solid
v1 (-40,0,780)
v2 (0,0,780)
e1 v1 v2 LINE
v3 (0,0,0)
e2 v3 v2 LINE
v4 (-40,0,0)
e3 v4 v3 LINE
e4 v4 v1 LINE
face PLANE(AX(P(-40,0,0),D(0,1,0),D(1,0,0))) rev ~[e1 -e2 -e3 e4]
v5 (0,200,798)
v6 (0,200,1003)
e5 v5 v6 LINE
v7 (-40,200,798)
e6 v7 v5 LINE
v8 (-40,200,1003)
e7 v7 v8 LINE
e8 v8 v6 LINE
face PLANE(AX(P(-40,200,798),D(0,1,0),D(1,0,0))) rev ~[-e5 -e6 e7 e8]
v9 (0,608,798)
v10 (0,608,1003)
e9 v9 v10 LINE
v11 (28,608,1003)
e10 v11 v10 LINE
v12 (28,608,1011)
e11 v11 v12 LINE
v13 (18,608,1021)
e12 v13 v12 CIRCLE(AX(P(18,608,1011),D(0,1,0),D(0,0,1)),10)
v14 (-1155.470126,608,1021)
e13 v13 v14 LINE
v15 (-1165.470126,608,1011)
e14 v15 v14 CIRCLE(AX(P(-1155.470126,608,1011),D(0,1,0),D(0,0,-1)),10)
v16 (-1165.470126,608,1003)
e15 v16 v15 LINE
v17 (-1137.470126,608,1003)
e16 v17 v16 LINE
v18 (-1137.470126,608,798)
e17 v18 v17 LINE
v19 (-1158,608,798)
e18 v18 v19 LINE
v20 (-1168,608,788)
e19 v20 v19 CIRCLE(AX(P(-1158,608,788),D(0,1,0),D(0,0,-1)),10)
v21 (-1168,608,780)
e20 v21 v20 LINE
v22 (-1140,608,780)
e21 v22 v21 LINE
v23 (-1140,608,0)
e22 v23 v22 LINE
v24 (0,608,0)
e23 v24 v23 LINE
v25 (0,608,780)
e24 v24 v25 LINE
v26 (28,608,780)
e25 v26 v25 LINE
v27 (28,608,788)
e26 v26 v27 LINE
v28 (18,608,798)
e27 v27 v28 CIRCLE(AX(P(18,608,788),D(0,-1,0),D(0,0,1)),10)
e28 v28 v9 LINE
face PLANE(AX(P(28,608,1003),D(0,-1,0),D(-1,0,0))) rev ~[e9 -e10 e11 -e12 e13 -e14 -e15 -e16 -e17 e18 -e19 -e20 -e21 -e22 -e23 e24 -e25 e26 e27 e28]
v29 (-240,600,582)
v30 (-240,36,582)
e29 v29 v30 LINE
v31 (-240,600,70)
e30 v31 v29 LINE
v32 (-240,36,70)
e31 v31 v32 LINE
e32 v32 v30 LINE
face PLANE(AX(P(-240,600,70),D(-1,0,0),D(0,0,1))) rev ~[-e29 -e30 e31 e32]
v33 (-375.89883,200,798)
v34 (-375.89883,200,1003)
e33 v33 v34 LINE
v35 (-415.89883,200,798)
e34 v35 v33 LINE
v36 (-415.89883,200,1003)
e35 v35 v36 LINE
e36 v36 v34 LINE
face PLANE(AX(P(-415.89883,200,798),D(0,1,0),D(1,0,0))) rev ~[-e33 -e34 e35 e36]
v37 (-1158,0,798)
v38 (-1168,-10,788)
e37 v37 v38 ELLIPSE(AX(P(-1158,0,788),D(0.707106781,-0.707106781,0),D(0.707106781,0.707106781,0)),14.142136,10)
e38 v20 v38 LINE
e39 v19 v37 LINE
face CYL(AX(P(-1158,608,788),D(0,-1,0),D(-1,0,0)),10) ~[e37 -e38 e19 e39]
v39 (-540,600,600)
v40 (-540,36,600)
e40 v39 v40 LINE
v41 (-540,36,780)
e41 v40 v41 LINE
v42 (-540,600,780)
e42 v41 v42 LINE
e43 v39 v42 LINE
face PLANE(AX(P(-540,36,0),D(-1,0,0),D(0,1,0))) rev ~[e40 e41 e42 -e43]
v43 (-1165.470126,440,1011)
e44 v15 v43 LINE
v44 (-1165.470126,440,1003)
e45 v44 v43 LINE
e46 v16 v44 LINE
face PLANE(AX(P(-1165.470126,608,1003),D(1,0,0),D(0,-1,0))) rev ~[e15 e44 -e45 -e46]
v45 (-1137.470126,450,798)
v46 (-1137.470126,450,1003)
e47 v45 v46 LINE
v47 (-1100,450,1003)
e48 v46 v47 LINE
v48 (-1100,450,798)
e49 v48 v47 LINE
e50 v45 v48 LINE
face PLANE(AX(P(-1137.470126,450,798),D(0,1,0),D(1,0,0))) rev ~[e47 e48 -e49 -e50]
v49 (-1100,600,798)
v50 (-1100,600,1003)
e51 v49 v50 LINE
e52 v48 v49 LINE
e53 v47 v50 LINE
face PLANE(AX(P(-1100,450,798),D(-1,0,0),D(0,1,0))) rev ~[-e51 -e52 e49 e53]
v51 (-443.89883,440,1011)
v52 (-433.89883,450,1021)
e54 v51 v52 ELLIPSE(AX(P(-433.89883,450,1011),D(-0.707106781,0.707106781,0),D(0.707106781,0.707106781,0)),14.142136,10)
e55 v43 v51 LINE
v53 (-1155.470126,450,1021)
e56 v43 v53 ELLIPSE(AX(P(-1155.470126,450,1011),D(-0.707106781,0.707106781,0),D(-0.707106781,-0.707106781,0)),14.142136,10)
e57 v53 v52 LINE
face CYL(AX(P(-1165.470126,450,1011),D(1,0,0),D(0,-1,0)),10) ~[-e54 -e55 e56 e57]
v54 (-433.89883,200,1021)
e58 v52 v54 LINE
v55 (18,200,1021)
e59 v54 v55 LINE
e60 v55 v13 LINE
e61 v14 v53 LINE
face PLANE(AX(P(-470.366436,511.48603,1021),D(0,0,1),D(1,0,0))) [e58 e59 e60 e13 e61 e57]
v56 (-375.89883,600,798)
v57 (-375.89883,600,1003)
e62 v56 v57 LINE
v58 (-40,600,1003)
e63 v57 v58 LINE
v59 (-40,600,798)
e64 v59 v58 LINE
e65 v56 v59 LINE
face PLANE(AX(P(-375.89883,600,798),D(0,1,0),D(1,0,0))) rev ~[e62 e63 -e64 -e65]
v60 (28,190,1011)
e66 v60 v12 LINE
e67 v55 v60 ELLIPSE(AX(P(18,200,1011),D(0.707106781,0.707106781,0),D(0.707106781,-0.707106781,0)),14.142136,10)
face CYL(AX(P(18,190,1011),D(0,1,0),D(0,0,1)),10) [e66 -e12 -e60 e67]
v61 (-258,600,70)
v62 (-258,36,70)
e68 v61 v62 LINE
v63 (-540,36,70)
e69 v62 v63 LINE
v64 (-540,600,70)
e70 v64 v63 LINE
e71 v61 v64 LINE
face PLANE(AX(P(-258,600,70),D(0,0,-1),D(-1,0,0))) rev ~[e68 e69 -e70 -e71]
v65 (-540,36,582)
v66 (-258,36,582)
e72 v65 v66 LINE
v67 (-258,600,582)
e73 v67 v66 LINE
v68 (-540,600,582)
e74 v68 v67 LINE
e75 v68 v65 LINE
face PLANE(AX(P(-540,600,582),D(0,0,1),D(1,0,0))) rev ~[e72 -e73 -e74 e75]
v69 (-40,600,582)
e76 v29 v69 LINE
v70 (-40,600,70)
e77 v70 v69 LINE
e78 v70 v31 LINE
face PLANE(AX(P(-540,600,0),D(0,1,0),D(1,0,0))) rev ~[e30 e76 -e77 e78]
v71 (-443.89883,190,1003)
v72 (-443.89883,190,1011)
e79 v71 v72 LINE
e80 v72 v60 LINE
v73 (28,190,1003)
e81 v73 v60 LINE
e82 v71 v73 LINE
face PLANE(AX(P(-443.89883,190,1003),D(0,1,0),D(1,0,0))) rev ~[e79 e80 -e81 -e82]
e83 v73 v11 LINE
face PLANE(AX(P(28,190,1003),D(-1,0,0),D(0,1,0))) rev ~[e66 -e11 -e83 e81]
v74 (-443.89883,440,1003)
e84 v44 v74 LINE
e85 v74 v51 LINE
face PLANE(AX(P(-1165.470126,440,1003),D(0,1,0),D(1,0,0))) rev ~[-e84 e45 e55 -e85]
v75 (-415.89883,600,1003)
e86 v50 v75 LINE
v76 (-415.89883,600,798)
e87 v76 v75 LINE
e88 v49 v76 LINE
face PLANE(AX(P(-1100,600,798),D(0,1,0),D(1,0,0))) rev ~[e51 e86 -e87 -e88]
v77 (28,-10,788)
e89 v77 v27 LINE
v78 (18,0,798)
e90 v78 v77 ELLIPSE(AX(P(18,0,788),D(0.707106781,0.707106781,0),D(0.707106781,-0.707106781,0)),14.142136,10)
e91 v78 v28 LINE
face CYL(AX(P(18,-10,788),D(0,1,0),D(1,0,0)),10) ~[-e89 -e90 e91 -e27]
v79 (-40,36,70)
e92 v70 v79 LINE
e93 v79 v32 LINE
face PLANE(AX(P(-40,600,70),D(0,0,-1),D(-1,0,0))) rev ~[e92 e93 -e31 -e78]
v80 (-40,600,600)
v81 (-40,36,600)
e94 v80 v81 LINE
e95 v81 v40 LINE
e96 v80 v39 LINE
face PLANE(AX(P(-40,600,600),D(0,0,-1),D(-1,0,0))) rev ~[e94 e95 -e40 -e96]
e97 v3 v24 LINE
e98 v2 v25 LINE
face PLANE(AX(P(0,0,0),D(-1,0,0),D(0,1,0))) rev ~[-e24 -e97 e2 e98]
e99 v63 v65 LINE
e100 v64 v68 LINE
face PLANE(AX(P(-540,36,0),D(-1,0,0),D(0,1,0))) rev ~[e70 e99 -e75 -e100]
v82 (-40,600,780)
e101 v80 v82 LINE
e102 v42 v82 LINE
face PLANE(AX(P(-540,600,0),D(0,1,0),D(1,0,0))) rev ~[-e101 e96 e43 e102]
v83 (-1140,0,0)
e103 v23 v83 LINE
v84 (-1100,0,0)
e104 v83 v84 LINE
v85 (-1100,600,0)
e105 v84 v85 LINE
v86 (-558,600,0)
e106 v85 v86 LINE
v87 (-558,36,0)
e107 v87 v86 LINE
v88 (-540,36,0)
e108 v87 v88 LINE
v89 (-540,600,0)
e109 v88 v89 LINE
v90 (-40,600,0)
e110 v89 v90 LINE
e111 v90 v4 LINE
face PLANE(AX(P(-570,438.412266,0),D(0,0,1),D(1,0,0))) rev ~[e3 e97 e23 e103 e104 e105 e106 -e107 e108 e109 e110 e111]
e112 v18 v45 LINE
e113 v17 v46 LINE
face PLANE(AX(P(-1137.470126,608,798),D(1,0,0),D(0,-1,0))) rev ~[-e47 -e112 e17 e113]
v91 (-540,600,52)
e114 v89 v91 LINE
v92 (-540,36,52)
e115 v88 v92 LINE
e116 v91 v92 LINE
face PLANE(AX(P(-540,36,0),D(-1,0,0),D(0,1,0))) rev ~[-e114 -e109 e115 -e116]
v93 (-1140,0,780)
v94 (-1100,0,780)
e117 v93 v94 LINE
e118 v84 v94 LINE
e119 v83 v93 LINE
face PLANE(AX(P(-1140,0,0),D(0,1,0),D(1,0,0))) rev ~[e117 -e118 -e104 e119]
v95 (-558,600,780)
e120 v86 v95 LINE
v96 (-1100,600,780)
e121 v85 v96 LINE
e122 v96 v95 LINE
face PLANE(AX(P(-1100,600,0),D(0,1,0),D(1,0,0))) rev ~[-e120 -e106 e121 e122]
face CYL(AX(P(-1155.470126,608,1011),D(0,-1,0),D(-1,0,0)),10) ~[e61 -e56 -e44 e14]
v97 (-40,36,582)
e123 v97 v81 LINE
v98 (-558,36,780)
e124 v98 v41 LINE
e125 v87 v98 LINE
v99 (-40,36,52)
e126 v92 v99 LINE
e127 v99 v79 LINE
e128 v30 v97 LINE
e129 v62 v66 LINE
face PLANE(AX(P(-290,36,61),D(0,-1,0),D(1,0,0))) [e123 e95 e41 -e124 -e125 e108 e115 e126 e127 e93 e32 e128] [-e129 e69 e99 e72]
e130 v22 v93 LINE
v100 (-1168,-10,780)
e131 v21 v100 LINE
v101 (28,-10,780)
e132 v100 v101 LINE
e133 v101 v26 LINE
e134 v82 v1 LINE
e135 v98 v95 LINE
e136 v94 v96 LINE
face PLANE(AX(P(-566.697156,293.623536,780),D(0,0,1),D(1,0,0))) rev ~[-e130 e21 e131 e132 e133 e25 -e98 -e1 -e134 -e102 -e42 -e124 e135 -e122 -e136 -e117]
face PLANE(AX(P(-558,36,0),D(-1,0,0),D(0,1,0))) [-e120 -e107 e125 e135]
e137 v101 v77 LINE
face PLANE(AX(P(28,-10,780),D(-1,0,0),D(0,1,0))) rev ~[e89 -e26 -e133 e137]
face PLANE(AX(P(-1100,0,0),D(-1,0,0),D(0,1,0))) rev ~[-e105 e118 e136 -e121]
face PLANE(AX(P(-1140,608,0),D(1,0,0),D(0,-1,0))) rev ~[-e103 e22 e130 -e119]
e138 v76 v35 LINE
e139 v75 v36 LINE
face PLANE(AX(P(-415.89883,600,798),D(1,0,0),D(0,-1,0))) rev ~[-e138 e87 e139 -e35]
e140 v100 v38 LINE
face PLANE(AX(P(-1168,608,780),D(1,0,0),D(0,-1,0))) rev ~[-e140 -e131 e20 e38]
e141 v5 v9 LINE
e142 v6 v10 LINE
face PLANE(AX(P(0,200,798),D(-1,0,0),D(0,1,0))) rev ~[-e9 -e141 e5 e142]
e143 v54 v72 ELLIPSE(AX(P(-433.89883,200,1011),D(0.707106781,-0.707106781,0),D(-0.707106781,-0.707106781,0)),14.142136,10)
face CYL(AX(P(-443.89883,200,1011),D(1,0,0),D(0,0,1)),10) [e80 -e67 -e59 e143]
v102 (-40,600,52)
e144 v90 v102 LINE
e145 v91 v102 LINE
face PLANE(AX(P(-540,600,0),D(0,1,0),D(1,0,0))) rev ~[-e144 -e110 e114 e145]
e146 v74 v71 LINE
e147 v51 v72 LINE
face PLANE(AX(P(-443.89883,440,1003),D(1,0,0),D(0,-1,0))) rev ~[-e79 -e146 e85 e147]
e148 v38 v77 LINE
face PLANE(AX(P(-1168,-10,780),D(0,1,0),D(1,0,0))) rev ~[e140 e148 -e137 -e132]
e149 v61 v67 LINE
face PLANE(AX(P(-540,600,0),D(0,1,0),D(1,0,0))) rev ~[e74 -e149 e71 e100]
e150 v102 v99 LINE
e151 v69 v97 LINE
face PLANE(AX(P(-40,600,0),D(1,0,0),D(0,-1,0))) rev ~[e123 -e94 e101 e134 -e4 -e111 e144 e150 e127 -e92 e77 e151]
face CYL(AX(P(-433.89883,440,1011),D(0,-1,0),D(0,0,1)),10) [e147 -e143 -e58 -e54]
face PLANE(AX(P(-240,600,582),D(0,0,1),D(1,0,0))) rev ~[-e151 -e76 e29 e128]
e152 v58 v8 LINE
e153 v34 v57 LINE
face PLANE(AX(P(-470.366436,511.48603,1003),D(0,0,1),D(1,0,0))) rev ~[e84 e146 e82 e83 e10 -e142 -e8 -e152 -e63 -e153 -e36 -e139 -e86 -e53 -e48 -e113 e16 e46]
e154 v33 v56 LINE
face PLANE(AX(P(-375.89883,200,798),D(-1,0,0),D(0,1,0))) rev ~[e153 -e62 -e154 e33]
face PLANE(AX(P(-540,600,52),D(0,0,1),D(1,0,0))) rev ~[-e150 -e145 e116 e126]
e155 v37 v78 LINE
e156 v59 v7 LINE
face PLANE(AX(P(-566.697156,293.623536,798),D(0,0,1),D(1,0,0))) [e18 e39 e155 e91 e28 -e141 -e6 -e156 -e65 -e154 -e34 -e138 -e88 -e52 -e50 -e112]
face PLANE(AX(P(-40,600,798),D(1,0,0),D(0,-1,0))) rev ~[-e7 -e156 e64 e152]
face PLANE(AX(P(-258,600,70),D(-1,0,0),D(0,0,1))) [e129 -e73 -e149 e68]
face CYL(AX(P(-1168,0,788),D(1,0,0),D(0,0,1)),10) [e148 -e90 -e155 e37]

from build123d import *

# Parameters (mm, degrees)
F0_W      = 18
F0_H      = 564
F1_DEPTH  = 780
F2_W      = 18
F2_H      = 512
F3_DEPTH  = 564
F5_DEPTH  = 18
F6_R      = 10
F7_W      = 40
F7_H      = 250
F7_H_2    = 150
F8_DEPTH  = 205
F10_DEPTH = 18
F11_R     = 10


with BuildPart() as f1:
    # F0 (on Top) → F1 (new body)
    with BuildSketch(Plane.XY):
        Polygon((-40, 0), (0, 0), (0, 608), (-1140, 608), (-1140, 0), (-1100, 0), (-1100, 600), (-558, 600), (-540, 600), (-40, 600), align=None)
        with Locations((-549, 318)):
            Rectangle(F0_W, F0_H)
    extrude(amount=F1_DEPTH)

    # F2 (on face) → F3 (join)
    with BuildSketch(Plane.XZ.offset(-600)):
        Polygon((-540, 70), (-540, 52), (-40, 52), (-40, 70), (-240, 70), (-258, 70), align=None)
        with Locations((-249, 326)):
            Rectangle(F2_W, F2_H)
        Polygon((-540, 600), (-540, 582), (-258, 582), (-240, 582), (-40, 582), (-40, 600), align=None)
    extrude(amount=F3_DEPTH)

    # F4 (on face) → F5 (join)
    with BuildSketch(Plane.XY.offset(780)):
        Polygon((28, 608), (0, 608), (0, 0), (-40, 0), (-40, 600), (-540, 600), (-540, 36), (-558, 36), (-558, 600), (-1100, 600), (-1100, 0), (-1140, 0), (-1140, 608), (-1168, 608), (-1168, -10), (28, -10), align=None)
        Polygon((0, 0), (0, 608), (-1140, 608), (-1140, 0), (-1100, 0), (-1100, 600), (-558, 600), (-558, 36), (-540, 36), (-540, 600), (-40, 600), (-40, 0), align=None)
    extrude(amount=F5_DEPTH)

    # F6
    f6_edges = [f1.edges().sort_by_distance(p)[0] for p in [
        (-570, -10, 798),
        (-1168, 299, 798),
        (28, 299, 798),
    ]]
    fillet(f6_edges, radius=F6_R)

    # F7 (on face) → F8 (join)
    with BuildSketch(Plane.XY.offset(798)):
        Polygon((0, 450), (0, 608), (-40, 608), (-40, 600), (-40, 450), align=None)
        Polygon((-40, 600), (-40, 608), (-1100, 608), (-1100, 600), (-415.8988296986, 600), (-375.8988296986, 600), align=None)
        with Locations((-20, 325)):
            Rectangle(F7_W, F7_H)
        Polygon((-1100, 600), (-1100, 608), (-1137.470126152, 608), (-1137.470126152, 450), (-1100, 450), align=None)
        with Locations((-395.8988296986, 525)):
            Rectangle(F7_W, F7_H_2)
        with Locations((-395.8988296986, 325)):
            Rectangle(F7_W, F7_H)
    extrude(amount=F8_DEPTH)

    # F9 (on face) → F10 (join)
    with BuildSketch(Plane.XY.offset(1003)):
        Polygon((0, 608), (-1137.470126152, 608), (-1137.470126152, 450), (-1100, 450), (-1100, 600), (-415.8988296986, 600), (-415.8988296986, 200), (-375.8988296986, 200), (-375.8988296986, 600), (-40, 600), (-40, 200), (0, 200), align=None)
        Polygon((-1137.470126152, 450), (-1137.470126152, 608), (-1165.470126152, 608), (-1165.470126152, 440), (-443.8988296986, 440), (-443.8988296986, 190), (28, 190), (28, 608), (0, 608), (0, 200), (-40, 200), (-40, 600), (-375.8988296986, 600), (-375.8988296986, 200), (-415.8988296986, 200), (-415.8988296986, 600), (-1100, 600), (-1100, 450), align=None)
    extrude(amount=F10_DEPTH)

    # F11
    f11_edges = [f1.edges().sort_by_distance(p)[0] for p in [
        (-1165.470126, 524, 1021),
        (-804.684478, 440, 1021),
        (-443.89883, 315, 1021),
        (-207.949415, 190, 1021),
        (28, 399, 1021),
    ]]
    fillet(f11_edges, radius=F11_R)


solid = f1.part
